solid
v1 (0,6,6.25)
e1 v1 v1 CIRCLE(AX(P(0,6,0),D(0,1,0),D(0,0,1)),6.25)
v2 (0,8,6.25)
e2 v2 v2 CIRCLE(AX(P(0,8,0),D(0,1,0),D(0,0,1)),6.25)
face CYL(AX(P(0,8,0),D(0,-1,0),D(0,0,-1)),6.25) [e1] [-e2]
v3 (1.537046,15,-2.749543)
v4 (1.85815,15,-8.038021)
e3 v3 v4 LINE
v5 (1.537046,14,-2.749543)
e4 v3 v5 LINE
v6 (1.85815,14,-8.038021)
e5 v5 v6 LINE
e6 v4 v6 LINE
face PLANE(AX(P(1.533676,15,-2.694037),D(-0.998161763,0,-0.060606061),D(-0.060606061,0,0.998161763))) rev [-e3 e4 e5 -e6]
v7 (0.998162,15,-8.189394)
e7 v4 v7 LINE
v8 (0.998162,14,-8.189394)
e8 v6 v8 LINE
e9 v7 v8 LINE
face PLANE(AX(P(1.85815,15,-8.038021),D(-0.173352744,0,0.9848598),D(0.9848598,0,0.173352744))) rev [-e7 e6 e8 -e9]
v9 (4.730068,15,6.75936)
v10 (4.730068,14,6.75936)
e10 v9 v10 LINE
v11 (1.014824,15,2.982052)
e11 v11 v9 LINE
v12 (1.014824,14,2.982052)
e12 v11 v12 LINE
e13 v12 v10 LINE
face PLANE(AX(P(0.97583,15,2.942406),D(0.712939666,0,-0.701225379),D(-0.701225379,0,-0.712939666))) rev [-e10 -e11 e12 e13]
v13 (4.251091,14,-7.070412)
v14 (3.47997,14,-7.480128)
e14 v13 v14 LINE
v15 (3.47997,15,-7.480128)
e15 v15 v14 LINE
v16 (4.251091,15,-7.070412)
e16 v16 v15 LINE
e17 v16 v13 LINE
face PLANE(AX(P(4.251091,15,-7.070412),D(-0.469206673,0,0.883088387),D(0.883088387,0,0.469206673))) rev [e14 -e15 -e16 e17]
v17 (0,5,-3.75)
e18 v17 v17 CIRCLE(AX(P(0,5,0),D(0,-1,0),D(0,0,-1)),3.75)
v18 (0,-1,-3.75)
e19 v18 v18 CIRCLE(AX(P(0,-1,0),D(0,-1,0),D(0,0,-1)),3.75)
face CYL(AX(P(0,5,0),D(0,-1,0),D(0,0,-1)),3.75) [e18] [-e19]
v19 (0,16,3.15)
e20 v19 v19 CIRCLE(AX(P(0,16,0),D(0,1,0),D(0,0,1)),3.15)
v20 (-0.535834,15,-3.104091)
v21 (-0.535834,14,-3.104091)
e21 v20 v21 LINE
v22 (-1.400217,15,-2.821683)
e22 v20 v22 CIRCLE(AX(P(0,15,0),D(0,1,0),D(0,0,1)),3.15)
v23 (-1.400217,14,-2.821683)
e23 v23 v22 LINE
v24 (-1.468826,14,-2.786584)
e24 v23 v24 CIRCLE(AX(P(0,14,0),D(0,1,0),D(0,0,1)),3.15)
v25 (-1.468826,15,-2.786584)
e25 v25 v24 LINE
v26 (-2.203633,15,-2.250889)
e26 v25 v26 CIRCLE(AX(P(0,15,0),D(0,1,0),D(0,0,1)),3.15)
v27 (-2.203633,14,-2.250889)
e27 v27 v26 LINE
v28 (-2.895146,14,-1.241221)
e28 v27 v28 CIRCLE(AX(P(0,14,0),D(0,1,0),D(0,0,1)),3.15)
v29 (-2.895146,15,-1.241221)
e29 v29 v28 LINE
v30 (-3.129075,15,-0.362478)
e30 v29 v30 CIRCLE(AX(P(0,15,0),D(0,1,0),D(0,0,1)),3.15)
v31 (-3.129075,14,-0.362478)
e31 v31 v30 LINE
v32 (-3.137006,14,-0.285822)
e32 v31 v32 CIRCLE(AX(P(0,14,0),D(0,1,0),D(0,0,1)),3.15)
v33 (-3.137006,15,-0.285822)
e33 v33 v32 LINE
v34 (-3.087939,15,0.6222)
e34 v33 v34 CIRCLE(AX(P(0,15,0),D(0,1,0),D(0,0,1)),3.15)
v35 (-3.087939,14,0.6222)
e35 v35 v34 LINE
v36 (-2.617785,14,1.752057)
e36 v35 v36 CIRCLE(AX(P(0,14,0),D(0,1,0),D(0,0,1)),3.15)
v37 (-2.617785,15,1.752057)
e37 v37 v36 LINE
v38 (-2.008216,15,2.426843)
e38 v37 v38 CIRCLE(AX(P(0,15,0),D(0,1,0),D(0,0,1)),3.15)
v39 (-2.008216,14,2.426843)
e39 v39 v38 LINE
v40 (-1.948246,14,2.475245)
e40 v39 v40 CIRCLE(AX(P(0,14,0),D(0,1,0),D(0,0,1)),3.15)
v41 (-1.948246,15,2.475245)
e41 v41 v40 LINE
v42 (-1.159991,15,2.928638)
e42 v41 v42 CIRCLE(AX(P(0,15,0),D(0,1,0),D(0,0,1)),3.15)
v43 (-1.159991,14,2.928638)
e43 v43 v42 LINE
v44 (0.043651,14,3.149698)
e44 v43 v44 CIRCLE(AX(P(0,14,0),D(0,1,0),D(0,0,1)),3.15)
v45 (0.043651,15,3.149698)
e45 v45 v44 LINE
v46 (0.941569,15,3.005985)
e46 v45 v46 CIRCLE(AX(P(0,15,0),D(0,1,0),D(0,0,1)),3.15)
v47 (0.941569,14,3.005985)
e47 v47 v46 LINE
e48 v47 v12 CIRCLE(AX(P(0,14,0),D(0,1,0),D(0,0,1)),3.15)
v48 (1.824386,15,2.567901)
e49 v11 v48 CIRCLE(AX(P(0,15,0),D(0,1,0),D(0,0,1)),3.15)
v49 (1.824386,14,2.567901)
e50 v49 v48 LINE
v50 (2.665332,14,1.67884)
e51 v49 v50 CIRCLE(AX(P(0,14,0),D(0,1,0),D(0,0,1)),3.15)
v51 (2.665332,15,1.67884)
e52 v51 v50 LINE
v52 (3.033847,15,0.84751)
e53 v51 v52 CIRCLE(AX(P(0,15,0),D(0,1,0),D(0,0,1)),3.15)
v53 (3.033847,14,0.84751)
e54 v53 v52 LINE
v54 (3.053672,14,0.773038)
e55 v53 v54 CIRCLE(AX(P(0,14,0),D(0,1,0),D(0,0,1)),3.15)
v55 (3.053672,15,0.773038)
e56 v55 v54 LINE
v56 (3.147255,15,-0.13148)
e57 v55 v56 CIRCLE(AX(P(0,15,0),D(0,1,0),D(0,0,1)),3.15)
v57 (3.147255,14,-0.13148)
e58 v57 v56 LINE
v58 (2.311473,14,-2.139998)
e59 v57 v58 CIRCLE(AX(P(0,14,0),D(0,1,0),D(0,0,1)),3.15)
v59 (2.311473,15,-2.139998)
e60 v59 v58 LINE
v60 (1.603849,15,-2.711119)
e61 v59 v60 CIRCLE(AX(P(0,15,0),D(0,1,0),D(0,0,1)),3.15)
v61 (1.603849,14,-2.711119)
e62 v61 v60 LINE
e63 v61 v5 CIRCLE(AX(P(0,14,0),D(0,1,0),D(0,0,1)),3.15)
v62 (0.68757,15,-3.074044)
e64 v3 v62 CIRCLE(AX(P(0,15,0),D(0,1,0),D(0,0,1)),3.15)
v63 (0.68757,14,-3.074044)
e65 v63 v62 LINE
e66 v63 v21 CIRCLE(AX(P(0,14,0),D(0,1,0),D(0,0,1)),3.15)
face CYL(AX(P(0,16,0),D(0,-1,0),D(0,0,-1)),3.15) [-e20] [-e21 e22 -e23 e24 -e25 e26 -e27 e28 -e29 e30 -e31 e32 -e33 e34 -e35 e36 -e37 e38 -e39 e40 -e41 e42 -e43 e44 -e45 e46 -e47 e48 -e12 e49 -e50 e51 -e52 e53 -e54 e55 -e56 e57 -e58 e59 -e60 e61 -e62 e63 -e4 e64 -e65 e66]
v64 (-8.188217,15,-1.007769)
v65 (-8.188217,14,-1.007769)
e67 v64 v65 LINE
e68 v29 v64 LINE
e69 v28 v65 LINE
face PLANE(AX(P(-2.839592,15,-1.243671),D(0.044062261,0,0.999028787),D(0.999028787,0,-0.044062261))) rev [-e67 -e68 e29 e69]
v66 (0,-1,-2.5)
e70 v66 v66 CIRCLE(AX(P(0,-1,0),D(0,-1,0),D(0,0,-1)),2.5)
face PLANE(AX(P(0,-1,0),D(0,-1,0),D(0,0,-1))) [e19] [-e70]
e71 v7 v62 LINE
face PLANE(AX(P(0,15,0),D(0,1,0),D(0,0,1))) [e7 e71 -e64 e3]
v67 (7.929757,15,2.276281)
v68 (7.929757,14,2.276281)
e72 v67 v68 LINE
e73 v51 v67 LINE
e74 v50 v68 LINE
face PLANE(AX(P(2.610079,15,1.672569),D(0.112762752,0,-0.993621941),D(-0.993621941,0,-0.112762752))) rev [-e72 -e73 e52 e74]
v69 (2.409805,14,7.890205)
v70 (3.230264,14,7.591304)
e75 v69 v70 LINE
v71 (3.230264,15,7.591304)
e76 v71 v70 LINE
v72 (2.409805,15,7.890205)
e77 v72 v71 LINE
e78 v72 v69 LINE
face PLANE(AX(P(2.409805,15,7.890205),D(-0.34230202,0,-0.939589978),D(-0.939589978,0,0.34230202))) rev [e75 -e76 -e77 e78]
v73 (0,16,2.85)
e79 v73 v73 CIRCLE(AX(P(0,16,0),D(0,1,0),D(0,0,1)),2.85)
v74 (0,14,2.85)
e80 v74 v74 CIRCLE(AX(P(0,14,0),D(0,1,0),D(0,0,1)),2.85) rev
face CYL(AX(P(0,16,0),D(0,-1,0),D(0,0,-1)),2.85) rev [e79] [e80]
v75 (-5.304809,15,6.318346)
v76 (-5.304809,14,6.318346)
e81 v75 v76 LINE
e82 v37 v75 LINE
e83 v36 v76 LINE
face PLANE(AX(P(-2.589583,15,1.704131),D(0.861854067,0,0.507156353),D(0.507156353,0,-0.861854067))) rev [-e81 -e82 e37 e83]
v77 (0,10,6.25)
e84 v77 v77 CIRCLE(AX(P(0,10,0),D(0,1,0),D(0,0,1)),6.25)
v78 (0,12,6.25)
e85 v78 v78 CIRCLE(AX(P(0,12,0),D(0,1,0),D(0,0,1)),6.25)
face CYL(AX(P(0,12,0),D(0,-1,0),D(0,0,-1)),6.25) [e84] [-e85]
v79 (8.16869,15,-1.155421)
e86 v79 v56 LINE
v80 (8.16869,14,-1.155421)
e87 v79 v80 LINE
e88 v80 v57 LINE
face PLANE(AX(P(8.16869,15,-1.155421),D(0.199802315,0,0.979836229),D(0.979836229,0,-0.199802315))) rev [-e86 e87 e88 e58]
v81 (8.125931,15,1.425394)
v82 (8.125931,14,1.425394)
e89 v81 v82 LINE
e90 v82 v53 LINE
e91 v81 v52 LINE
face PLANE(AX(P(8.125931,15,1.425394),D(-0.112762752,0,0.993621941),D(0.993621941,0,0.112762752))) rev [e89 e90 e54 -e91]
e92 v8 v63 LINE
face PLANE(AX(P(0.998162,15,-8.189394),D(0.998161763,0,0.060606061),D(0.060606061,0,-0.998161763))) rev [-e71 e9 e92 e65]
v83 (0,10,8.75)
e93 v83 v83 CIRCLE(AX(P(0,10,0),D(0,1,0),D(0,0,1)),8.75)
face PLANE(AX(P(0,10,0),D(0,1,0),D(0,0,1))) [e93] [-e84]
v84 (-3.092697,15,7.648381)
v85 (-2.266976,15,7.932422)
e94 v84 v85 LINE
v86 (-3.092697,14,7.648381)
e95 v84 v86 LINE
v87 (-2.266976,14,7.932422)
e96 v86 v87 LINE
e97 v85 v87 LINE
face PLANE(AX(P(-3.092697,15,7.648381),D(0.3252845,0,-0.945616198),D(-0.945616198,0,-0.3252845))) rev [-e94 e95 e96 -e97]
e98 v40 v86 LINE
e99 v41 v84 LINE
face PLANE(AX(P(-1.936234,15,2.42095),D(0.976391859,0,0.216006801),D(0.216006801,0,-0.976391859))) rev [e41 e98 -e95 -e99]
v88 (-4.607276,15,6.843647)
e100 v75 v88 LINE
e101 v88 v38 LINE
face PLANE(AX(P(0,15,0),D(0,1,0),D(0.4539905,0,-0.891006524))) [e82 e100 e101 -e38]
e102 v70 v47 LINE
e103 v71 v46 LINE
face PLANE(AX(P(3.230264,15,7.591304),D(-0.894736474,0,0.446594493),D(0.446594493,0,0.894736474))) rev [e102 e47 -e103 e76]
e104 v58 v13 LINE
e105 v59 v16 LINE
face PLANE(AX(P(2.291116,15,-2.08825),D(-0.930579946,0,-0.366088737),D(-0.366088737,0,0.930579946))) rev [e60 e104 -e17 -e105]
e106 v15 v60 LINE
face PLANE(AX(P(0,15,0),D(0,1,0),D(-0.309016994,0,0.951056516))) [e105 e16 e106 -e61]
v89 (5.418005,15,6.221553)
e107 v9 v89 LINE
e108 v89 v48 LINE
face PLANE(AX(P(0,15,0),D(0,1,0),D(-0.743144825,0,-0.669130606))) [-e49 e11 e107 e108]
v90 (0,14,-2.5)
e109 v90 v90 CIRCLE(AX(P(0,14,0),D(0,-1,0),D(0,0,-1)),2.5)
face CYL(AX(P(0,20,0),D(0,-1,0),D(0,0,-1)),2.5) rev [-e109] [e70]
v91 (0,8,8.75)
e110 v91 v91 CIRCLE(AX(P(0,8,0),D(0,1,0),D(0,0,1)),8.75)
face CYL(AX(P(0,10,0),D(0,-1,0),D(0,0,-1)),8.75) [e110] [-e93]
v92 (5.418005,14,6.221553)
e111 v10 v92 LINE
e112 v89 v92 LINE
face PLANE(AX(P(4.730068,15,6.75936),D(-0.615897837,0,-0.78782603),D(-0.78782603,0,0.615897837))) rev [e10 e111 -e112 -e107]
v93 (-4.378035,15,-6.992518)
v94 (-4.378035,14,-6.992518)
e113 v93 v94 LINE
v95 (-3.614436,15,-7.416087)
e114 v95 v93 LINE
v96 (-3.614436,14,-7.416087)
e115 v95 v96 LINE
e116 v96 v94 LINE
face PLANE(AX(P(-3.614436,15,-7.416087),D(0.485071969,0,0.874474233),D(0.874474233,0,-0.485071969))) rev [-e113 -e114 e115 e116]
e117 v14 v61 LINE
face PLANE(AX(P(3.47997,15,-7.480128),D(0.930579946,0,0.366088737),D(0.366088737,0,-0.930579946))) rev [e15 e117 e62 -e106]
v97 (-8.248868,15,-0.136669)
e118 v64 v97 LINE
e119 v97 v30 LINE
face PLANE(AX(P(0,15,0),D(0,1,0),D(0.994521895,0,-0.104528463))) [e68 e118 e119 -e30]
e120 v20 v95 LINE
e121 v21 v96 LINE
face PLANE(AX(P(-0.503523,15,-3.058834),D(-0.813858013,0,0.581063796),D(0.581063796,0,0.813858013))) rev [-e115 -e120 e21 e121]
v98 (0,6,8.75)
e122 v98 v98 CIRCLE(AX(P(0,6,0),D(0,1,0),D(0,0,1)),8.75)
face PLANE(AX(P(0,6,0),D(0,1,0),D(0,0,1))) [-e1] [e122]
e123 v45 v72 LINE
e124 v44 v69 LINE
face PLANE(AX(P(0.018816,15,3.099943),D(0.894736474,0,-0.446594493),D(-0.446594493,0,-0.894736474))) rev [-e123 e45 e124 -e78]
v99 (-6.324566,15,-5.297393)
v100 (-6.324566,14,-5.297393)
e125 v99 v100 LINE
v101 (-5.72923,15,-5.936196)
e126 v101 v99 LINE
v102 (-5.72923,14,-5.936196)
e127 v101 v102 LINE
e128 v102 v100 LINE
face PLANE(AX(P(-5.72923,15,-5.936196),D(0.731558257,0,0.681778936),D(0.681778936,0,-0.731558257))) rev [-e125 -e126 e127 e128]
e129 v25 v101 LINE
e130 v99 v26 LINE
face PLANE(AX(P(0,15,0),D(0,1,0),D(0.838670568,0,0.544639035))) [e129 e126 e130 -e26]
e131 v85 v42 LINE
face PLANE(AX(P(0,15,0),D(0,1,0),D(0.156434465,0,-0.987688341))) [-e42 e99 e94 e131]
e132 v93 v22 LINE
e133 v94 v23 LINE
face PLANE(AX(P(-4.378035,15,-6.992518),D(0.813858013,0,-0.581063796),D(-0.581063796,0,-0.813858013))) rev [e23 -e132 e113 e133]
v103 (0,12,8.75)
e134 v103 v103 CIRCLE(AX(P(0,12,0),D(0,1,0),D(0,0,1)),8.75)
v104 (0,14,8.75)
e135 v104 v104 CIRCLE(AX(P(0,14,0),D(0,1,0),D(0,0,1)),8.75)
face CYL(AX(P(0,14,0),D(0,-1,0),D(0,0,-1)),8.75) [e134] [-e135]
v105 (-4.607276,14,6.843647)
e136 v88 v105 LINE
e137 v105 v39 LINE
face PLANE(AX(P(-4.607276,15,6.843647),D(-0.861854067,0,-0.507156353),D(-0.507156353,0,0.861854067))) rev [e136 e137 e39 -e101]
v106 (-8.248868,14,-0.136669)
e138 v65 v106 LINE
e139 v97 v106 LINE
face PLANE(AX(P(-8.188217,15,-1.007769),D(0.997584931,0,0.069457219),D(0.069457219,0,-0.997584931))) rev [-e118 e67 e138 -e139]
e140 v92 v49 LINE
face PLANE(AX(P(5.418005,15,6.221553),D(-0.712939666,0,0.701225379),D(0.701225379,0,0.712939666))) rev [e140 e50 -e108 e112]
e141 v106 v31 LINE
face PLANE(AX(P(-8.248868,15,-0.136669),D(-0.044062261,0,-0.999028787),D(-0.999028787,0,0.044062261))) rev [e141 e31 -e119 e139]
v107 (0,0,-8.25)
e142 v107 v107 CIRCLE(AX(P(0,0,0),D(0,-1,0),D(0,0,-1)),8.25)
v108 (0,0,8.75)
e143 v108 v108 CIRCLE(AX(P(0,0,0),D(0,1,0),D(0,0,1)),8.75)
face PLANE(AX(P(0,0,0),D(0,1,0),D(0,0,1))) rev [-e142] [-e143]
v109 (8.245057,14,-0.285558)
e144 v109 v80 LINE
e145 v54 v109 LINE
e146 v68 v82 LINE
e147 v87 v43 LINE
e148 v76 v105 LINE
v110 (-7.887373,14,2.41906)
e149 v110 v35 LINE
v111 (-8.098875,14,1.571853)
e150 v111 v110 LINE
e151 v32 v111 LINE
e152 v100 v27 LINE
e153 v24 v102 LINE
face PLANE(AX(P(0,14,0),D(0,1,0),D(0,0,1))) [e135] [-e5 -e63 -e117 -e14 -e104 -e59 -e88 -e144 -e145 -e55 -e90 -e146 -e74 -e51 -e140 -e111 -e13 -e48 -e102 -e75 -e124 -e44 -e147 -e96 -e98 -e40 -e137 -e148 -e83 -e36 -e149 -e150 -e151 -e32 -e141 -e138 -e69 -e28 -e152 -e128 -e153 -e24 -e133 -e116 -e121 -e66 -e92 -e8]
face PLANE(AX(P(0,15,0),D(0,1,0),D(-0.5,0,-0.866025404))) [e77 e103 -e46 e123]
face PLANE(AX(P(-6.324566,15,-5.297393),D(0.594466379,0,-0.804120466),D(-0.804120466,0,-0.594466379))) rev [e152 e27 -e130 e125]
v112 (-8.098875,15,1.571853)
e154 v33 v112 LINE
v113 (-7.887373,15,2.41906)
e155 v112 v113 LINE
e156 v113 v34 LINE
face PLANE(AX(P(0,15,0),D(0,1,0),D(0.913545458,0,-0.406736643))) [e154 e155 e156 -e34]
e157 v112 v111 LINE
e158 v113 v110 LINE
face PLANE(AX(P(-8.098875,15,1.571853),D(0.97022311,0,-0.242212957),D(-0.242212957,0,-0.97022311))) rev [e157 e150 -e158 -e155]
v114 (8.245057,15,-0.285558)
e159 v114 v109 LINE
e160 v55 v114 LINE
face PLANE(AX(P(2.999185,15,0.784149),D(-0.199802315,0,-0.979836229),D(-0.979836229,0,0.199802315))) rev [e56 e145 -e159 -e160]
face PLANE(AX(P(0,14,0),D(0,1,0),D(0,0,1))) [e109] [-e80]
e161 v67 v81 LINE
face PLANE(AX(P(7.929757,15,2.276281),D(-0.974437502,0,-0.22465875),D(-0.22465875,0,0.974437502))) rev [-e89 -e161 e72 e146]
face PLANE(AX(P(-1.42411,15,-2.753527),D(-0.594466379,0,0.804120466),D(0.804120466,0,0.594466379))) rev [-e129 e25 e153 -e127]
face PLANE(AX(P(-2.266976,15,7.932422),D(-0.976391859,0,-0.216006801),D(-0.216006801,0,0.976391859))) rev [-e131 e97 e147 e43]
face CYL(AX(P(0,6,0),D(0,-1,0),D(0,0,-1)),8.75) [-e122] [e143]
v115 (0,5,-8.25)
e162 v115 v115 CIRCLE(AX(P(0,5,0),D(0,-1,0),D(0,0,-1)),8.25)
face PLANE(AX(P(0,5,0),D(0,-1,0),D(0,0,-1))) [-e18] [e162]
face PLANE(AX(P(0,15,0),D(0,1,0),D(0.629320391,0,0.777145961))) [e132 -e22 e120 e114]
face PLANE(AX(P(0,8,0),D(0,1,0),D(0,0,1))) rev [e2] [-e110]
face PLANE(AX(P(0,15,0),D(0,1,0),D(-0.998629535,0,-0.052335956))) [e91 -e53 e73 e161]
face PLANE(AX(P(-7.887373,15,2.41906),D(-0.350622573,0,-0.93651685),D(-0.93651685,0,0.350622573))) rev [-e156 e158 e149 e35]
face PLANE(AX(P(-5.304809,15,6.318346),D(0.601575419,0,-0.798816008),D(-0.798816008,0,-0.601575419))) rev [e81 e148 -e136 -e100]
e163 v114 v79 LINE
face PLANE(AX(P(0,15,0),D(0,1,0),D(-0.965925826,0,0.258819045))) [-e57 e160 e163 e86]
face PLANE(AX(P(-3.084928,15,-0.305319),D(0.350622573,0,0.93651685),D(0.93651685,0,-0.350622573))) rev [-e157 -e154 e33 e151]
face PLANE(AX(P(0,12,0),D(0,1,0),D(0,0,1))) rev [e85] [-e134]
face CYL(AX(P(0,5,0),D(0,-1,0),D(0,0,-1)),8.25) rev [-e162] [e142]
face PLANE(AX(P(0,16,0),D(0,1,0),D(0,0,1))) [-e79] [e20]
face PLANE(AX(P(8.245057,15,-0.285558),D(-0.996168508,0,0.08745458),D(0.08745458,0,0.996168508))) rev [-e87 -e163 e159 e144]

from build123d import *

# Parameters (mm, degrees)
SKETCH1_R            = 8.75
BOSS_EXTRUDE1_DEPTH  = 6
SKETCH2_R            = 8.25
SKETCH2_R_2          = 3.75
CUT_EXTRUDE1_DEPTH   = 5
SKETCH3_R            = 2.5
CUT_EXTRUDE2_DEPTH   = 20
BOSS_EXTRUDE3_START  = 1
SKETCH5_R            = 3.75
SKETCH5_R_2          = 2.5
BOSS_EXTRUDE3_DEPTH  = 1
SKETCH4_R            = 6.25
BOSS_EXTRUDE4_DEPTH  = 2
SKETCH7_R            = 8.75
BOSS_EXTRUDE5_DEPTH  = 2
SKETCH9_R            = 6.25
BOSS_EXTRUDE6_DEPTH  = 2
SKETCH10_R           = 8.75
BOSS_EXTRUDE7_DEPTH  = 2
SKETCH11_R           = 2.5
CUT_EXTRUDE4_DEPTH   = 15.735162028
SKETCH12_R           = 3.1
BOSS_EXTRUDE8_DEPTH  = 1
SKETCH13_R           = 3.065
CUT_EXTRUDE5_DEPTH   = 1
CUT_EXTRUDE6_START   = -1
SKETCH15_R           = 8.25
CUT_EXTRUDE6_DEPTH   = 1
SKETCH16_R           = 3.15
SKETCH16_R_2         = 2.85
BOSS_EXTRUDE10_DEPTH = 2
BOSS_EXTRUDE11_DEPTH = 1
CIRPATTERN1_START    = 14
CIRPATTERN1_DEPTH    = 1


# Read off the part's stored shape, not the designer's step: CirPattern1
with BuildPart() as part:
    # Sketch1 → Boss-Extrude1 (new body)
    with BuildSketch(Plane(origin=(0, 0, 0), x_dir=(1, 0, 0), z_dir=(0, 1, 0))):
        with Locations(Location((0, 0, 0), (0, 0, 270))):
            Circle(SKETCH1_R)
    extrude(amount=BOSS_EXTRUDE1_DEPTH)

    # Sketch2 → Cut-Extrude1 (cut)
    with BuildSketch(Plane.XZ):
        with Locations(Location((0, 0, 0), (0, 0, 270))):
            Circle(SKETCH2_R)
        with Locations(Location((0, 0, 0), (0, 0, 270))):
            Circle(SKETCH2_R_2, mode=Mode.SUBTRACT)
    extrude(amount=-CUT_EXTRUDE1_DEPTH, mode=Mode.SUBTRACT)

    # Sketch3 → Cut-Extrude2 (cut)
    with BuildSketch(Plane.XZ):
        with Locations(Location((0, 0, 0), (0, 0, 270))):
            Circle(SKETCH3_R)
    extrude(amount=-CUT_EXTRUDE2_DEPTH, mode=Mode.SUBTRACT)

    # Sketch5 → Boss-Extrude3 (add)
    with BuildSketch(Plane.XZ.offset(BOSS_EXTRUDE3_START)):
        with Locations(Location((0, 0, 0), (0, 0, 270))):
            Circle(SKETCH5_R)
        with Locations(Location((0, 0, 0), (0, 0, 270))):
            Circle(SKETCH5_R_2, mode=Mode.SUBTRACT)
    extrude(amount=-BOSS_EXTRUDE3_DEPTH)

    # Sketch4 → Boss-Extrude4 (add)
    with BuildSketch(Plane(origin=(0, 6, 0), x_dir=(1, 0, 0), z_dir=(0, 1, 0))):
        with Locations(Location((0, 0, 0), (0, 0, 270))):
            Circle(SKETCH4_R)
    extrude(amount=BOSS_EXTRUDE4_DEPTH)

    # Sketch7 → Boss-Extrude5 (add)
    with BuildSketch(Plane(origin=(0, 8, 0), x_dir=(1, 0, 0), z_dir=(0, 1, 0))):
        with Locations(Location((0, 0, 0), (0, 0, 270))):
            Circle(SKETCH7_R)
    extrude(amount=BOSS_EXTRUDE5_DEPTH)

    # Sketch9 → Boss-Extrude6 (add)
    with BuildSketch(Plane(origin=(0, 10, 0), x_dir=(1, 0, 0), z_dir=(0, 1, 0))):
        with Locations(Location((0, 0, 0), (0, 0, 270))):
            Circle(SKETCH9_R)
    extrude(amount=BOSS_EXTRUDE6_DEPTH)

    # Sketch10 → Boss-Extrude7 (add)
    with BuildSketch(Plane(origin=(0, 12, 0), x_dir=(1, 0, 0), z_dir=(0, 1, 0))):
        with Locations(Location((0, 0, 0), (0, 0, 270))):
            Circle(SKETCH10_R)
    extrude(amount=BOSS_EXTRUDE7_DEPTH)

    # Sketch11 → Cut-Extrude4 (cut, through all)
    with BuildSketch(Plane.XZ.offset(-6)):
        with Locations(Location((0, 0, 0), (0, 0, 270))):
            Circle(SKETCH11_R)
    extrude(amount=-CUT_EXTRUDE4_DEPTH, mode=Mode.SUBTRACT)

    # Sketch12 → Boss-Extrude8 (add)
    with BuildSketch(Plane(origin=(0, 14, 0), x_dir=(1, 0, 0), z_dir=(0, 1, 0))):
        with Locations(Location((0, 0, 0), (0, 0, 270))):
            Circle(SKETCH12_R)
    extrude(amount=BOSS_EXTRUDE8_DEPTH)

    # Sketch13 → Cut-Extrude5 (cut)
    with BuildSketch(Plane(origin=(0, 15, 0), x_dir=(1, 0, 0), z_dir=(0, 1, 0))):
        with Locations(Location((0, 0, 0), (0, 0, 270))):
            Circle(SKETCH13_R)
    extrude(amount=-CUT_EXTRUDE5_DEPTH, mode=Mode.SUBTRACT)

    # Sketch15 → Cut-Extrude6 (cut)
    with BuildSketch(Plane(origin=(0, 15, 0), x_dir=(1, 0, 0), z_dir=(0, 1, 0)).offset(CUT_EXTRUDE6_START)):
        with Locations(Location((0, 0, 0), (0, 0, 90))):
            Circle(SKETCH15_R)
    extrude(amount=CUT_EXTRUDE6_DEPTH, mode=Mode.SUBTRACT)

    # Sketch16 → Boss-Extrude10 (add)
    with BuildSketch(Plane(origin=(0, 14, 0), x_dir=(1, 0, 0), z_dir=(0, 1, 0))):
        with Locations(Location((0, 0, 0), (0, 0, 270))):
            Circle(SKETCH16_R)
        with Locations(Location((0, 0, 0), (0, 0, 270))):
            Circle(SKETCH16_R_2, mode=Mode.SUBTRACT)
    extrude(amount=BOSS_EXTRUDE10_DEPTH)

    # Sketch14 → Boss-Extrude11 (add)
    with BuildSketch(Plane(origin=(0, 14, 0), x_dir=(1, 0, 0), z_dir=(0, 1, 0))):
        Polygon((0.998161763, 8.189393939), (0.684499773, 3.023484755), (1.533676009, 2.694037472), (1.858150244, 8.038020756), align=None)
    extrude(amount=BOSS_EXTRUDE11_DEPTH)

    # CirPattern1 outline → CirPattern1 (add)
    with BuildSketch(Plane(origin=(0, 0, 0), x_dir=(1, 0, 0), z_dir=(0, 1, 0)).offset(CIRPATTERN1_START)):
        with BuildLine():
            Line((-6.324565807, 5.297392505), (-2.203633173, 2.2508889))
            ThreePointArc((-2.203633173, 2.2508889), (-1.85566188, 2.545391716), (-1.468825776, 2.786584081))
            Line((-1.468825776, 2.786584081), (-5.729230277, 5.936195788))
            Line((-5.729230277, 5.936195788), (-6.324565807, 5.297392505))
        make_face()
        with BuildLine():
            ThreePointArc((-3.129074903, 0.362477928), (-3.043987046, 0.810335032), (-2.895146203, 1.241220553))
            Line((-2.895146203, 1.241220553), (-8.188217227, 1.007769145))
            Line((-8.188217227, 1.007769145), (-8.248867898, 0.136668965))
            Line((-8.248867898, 0.136668965), (-3.129074903, 0.362477928))
        make_face()
        with BuildLine():
            Line((-4.378035213, 6.992517978), (-1.400216766, 2.821682656))
            ThreePointArc((-1.400216766, 2.821682656), (-0.978270026, 2.994242435), (-0.535834488, 3.104091075))
            Line((-0.535834488, 3.104091075), (-3.614436407, 7.416087207))
            Line((-3.614436407, 7.416087207), (-4.378035213, 6.992517978))
        make_face()
        with BuildLine():
            ThreePointArc((-3.087938917, -0.622200326), (-3.145411012, -0.169969315), (-3.137005907, 0.285821517))
            Line((-3.137005907, 0.285821517), (-8.098875142, -1.571852864))
            Line((-8.098875142, -1.571852864), (-7.887372599, -2.419060455))
            Line((-7.887372599, -2.419060455), (-3.087938917, -0.622200326))
        make_face()
        with BuildLine():
            Line((3.47997015, 7.480127523), (1.603849487, 2.711119109))
            ThreePointArc((1.603849487, 2.711119109), (1.97837896, 2.451227588), (2.311473446, 2.139997782))
            Line((2.311473446, 2.139997782), (4.251090913, 7.070412014))
            Line((4.251090913, 7.070412014), (3.47997015, 7.480127523))
        make_face()
        with BuildLine():
            ThreePointArc((-2.008215906, -2.426843397), (-2.337478309, -2.111562255), (-2.61778478, -1.752056747))
            Line((-2.61778478, -1.752056747), (-5.30480905, -6.318346377))
            Line((-5.30480905, -6.318346377), (-4.60727569, -6.843647471))
            Line((-4.60727569, -6.843647471), (-2.008215906, -2.426843397))
        make_face()
        with BuildLine():
            Line((8.168690382, 1.155420894), (3.14725484, 0.131479935))
            ThreePointArc((3.14725484, 0.131479935), (3.133274841, -0.324173978), (3.053671823, -0.773038421))
            Line((3.053671823, -0.773038421), (8.245056512, 0.285557547))
            Line((8.245056512, 0.285557547), (8.168690382, 1.155420894))
        make_face()
        with BuildLine():
            ThreePointArc((-1.159990971, -2.92863807), (-1.570565356, -2.730535563), (-1.948245964, -2.47524497))
            Line((-1.948245964, -2.47524497), (-3.092696808, -7.648380643))
            Line((-3.092696808, -7.648380643), (-2.266976195, -7.932422009))
            Line((-2.266976195, -7.932422009), (-1.159990971, -2.92863807))
        make_face()
        with BuildLine():
            Line((8.125930909, -1.42539358), (3.033846758, -0.847510382))
            ThreePointArc((3.033846758, -0.847510382), (2.879746187, -1.276542948), (2.665332476, -1.678839716))
            Line((2.665332476, -1.678839716), (7.929756858, -2.276281216))
            Line((7.929756858, -2.276281216), (8.125930909, -1.42539358))
        make_face()
        with BuildLine():
            ThreePointArc((0.941569357, -3.00598522), (0.497823185, -3.11041349), (0.04365065, -3.149697544))
            Line((0.04365065, -3.149697544), (2.409805062, -7.890205293))
            Line((2.409805062, -7.890205293), (3.230263526, -7.591304075))
            Line((3.230263526, -7.591304075), (0.941569357, -3.00598522))
        make_face()
        with BuildLine():
            Line((5.418005144, -6.221552882), (1.824386191, -2.567900899))
            ThreePointArc((1.824386191, -2.567900899), (1.434628612, -2.804343193), (1.014824303, -2.982051581))
            Line((1.014824303, -2.982051581), (4.730068332, -6.759360441))
            Line((4.730068332, -6.759360441), (5.418005144, -6.221552882))
        make_face()
    extrude(amount=CIRPATTERN1_DEPTH)


solid = part.part
